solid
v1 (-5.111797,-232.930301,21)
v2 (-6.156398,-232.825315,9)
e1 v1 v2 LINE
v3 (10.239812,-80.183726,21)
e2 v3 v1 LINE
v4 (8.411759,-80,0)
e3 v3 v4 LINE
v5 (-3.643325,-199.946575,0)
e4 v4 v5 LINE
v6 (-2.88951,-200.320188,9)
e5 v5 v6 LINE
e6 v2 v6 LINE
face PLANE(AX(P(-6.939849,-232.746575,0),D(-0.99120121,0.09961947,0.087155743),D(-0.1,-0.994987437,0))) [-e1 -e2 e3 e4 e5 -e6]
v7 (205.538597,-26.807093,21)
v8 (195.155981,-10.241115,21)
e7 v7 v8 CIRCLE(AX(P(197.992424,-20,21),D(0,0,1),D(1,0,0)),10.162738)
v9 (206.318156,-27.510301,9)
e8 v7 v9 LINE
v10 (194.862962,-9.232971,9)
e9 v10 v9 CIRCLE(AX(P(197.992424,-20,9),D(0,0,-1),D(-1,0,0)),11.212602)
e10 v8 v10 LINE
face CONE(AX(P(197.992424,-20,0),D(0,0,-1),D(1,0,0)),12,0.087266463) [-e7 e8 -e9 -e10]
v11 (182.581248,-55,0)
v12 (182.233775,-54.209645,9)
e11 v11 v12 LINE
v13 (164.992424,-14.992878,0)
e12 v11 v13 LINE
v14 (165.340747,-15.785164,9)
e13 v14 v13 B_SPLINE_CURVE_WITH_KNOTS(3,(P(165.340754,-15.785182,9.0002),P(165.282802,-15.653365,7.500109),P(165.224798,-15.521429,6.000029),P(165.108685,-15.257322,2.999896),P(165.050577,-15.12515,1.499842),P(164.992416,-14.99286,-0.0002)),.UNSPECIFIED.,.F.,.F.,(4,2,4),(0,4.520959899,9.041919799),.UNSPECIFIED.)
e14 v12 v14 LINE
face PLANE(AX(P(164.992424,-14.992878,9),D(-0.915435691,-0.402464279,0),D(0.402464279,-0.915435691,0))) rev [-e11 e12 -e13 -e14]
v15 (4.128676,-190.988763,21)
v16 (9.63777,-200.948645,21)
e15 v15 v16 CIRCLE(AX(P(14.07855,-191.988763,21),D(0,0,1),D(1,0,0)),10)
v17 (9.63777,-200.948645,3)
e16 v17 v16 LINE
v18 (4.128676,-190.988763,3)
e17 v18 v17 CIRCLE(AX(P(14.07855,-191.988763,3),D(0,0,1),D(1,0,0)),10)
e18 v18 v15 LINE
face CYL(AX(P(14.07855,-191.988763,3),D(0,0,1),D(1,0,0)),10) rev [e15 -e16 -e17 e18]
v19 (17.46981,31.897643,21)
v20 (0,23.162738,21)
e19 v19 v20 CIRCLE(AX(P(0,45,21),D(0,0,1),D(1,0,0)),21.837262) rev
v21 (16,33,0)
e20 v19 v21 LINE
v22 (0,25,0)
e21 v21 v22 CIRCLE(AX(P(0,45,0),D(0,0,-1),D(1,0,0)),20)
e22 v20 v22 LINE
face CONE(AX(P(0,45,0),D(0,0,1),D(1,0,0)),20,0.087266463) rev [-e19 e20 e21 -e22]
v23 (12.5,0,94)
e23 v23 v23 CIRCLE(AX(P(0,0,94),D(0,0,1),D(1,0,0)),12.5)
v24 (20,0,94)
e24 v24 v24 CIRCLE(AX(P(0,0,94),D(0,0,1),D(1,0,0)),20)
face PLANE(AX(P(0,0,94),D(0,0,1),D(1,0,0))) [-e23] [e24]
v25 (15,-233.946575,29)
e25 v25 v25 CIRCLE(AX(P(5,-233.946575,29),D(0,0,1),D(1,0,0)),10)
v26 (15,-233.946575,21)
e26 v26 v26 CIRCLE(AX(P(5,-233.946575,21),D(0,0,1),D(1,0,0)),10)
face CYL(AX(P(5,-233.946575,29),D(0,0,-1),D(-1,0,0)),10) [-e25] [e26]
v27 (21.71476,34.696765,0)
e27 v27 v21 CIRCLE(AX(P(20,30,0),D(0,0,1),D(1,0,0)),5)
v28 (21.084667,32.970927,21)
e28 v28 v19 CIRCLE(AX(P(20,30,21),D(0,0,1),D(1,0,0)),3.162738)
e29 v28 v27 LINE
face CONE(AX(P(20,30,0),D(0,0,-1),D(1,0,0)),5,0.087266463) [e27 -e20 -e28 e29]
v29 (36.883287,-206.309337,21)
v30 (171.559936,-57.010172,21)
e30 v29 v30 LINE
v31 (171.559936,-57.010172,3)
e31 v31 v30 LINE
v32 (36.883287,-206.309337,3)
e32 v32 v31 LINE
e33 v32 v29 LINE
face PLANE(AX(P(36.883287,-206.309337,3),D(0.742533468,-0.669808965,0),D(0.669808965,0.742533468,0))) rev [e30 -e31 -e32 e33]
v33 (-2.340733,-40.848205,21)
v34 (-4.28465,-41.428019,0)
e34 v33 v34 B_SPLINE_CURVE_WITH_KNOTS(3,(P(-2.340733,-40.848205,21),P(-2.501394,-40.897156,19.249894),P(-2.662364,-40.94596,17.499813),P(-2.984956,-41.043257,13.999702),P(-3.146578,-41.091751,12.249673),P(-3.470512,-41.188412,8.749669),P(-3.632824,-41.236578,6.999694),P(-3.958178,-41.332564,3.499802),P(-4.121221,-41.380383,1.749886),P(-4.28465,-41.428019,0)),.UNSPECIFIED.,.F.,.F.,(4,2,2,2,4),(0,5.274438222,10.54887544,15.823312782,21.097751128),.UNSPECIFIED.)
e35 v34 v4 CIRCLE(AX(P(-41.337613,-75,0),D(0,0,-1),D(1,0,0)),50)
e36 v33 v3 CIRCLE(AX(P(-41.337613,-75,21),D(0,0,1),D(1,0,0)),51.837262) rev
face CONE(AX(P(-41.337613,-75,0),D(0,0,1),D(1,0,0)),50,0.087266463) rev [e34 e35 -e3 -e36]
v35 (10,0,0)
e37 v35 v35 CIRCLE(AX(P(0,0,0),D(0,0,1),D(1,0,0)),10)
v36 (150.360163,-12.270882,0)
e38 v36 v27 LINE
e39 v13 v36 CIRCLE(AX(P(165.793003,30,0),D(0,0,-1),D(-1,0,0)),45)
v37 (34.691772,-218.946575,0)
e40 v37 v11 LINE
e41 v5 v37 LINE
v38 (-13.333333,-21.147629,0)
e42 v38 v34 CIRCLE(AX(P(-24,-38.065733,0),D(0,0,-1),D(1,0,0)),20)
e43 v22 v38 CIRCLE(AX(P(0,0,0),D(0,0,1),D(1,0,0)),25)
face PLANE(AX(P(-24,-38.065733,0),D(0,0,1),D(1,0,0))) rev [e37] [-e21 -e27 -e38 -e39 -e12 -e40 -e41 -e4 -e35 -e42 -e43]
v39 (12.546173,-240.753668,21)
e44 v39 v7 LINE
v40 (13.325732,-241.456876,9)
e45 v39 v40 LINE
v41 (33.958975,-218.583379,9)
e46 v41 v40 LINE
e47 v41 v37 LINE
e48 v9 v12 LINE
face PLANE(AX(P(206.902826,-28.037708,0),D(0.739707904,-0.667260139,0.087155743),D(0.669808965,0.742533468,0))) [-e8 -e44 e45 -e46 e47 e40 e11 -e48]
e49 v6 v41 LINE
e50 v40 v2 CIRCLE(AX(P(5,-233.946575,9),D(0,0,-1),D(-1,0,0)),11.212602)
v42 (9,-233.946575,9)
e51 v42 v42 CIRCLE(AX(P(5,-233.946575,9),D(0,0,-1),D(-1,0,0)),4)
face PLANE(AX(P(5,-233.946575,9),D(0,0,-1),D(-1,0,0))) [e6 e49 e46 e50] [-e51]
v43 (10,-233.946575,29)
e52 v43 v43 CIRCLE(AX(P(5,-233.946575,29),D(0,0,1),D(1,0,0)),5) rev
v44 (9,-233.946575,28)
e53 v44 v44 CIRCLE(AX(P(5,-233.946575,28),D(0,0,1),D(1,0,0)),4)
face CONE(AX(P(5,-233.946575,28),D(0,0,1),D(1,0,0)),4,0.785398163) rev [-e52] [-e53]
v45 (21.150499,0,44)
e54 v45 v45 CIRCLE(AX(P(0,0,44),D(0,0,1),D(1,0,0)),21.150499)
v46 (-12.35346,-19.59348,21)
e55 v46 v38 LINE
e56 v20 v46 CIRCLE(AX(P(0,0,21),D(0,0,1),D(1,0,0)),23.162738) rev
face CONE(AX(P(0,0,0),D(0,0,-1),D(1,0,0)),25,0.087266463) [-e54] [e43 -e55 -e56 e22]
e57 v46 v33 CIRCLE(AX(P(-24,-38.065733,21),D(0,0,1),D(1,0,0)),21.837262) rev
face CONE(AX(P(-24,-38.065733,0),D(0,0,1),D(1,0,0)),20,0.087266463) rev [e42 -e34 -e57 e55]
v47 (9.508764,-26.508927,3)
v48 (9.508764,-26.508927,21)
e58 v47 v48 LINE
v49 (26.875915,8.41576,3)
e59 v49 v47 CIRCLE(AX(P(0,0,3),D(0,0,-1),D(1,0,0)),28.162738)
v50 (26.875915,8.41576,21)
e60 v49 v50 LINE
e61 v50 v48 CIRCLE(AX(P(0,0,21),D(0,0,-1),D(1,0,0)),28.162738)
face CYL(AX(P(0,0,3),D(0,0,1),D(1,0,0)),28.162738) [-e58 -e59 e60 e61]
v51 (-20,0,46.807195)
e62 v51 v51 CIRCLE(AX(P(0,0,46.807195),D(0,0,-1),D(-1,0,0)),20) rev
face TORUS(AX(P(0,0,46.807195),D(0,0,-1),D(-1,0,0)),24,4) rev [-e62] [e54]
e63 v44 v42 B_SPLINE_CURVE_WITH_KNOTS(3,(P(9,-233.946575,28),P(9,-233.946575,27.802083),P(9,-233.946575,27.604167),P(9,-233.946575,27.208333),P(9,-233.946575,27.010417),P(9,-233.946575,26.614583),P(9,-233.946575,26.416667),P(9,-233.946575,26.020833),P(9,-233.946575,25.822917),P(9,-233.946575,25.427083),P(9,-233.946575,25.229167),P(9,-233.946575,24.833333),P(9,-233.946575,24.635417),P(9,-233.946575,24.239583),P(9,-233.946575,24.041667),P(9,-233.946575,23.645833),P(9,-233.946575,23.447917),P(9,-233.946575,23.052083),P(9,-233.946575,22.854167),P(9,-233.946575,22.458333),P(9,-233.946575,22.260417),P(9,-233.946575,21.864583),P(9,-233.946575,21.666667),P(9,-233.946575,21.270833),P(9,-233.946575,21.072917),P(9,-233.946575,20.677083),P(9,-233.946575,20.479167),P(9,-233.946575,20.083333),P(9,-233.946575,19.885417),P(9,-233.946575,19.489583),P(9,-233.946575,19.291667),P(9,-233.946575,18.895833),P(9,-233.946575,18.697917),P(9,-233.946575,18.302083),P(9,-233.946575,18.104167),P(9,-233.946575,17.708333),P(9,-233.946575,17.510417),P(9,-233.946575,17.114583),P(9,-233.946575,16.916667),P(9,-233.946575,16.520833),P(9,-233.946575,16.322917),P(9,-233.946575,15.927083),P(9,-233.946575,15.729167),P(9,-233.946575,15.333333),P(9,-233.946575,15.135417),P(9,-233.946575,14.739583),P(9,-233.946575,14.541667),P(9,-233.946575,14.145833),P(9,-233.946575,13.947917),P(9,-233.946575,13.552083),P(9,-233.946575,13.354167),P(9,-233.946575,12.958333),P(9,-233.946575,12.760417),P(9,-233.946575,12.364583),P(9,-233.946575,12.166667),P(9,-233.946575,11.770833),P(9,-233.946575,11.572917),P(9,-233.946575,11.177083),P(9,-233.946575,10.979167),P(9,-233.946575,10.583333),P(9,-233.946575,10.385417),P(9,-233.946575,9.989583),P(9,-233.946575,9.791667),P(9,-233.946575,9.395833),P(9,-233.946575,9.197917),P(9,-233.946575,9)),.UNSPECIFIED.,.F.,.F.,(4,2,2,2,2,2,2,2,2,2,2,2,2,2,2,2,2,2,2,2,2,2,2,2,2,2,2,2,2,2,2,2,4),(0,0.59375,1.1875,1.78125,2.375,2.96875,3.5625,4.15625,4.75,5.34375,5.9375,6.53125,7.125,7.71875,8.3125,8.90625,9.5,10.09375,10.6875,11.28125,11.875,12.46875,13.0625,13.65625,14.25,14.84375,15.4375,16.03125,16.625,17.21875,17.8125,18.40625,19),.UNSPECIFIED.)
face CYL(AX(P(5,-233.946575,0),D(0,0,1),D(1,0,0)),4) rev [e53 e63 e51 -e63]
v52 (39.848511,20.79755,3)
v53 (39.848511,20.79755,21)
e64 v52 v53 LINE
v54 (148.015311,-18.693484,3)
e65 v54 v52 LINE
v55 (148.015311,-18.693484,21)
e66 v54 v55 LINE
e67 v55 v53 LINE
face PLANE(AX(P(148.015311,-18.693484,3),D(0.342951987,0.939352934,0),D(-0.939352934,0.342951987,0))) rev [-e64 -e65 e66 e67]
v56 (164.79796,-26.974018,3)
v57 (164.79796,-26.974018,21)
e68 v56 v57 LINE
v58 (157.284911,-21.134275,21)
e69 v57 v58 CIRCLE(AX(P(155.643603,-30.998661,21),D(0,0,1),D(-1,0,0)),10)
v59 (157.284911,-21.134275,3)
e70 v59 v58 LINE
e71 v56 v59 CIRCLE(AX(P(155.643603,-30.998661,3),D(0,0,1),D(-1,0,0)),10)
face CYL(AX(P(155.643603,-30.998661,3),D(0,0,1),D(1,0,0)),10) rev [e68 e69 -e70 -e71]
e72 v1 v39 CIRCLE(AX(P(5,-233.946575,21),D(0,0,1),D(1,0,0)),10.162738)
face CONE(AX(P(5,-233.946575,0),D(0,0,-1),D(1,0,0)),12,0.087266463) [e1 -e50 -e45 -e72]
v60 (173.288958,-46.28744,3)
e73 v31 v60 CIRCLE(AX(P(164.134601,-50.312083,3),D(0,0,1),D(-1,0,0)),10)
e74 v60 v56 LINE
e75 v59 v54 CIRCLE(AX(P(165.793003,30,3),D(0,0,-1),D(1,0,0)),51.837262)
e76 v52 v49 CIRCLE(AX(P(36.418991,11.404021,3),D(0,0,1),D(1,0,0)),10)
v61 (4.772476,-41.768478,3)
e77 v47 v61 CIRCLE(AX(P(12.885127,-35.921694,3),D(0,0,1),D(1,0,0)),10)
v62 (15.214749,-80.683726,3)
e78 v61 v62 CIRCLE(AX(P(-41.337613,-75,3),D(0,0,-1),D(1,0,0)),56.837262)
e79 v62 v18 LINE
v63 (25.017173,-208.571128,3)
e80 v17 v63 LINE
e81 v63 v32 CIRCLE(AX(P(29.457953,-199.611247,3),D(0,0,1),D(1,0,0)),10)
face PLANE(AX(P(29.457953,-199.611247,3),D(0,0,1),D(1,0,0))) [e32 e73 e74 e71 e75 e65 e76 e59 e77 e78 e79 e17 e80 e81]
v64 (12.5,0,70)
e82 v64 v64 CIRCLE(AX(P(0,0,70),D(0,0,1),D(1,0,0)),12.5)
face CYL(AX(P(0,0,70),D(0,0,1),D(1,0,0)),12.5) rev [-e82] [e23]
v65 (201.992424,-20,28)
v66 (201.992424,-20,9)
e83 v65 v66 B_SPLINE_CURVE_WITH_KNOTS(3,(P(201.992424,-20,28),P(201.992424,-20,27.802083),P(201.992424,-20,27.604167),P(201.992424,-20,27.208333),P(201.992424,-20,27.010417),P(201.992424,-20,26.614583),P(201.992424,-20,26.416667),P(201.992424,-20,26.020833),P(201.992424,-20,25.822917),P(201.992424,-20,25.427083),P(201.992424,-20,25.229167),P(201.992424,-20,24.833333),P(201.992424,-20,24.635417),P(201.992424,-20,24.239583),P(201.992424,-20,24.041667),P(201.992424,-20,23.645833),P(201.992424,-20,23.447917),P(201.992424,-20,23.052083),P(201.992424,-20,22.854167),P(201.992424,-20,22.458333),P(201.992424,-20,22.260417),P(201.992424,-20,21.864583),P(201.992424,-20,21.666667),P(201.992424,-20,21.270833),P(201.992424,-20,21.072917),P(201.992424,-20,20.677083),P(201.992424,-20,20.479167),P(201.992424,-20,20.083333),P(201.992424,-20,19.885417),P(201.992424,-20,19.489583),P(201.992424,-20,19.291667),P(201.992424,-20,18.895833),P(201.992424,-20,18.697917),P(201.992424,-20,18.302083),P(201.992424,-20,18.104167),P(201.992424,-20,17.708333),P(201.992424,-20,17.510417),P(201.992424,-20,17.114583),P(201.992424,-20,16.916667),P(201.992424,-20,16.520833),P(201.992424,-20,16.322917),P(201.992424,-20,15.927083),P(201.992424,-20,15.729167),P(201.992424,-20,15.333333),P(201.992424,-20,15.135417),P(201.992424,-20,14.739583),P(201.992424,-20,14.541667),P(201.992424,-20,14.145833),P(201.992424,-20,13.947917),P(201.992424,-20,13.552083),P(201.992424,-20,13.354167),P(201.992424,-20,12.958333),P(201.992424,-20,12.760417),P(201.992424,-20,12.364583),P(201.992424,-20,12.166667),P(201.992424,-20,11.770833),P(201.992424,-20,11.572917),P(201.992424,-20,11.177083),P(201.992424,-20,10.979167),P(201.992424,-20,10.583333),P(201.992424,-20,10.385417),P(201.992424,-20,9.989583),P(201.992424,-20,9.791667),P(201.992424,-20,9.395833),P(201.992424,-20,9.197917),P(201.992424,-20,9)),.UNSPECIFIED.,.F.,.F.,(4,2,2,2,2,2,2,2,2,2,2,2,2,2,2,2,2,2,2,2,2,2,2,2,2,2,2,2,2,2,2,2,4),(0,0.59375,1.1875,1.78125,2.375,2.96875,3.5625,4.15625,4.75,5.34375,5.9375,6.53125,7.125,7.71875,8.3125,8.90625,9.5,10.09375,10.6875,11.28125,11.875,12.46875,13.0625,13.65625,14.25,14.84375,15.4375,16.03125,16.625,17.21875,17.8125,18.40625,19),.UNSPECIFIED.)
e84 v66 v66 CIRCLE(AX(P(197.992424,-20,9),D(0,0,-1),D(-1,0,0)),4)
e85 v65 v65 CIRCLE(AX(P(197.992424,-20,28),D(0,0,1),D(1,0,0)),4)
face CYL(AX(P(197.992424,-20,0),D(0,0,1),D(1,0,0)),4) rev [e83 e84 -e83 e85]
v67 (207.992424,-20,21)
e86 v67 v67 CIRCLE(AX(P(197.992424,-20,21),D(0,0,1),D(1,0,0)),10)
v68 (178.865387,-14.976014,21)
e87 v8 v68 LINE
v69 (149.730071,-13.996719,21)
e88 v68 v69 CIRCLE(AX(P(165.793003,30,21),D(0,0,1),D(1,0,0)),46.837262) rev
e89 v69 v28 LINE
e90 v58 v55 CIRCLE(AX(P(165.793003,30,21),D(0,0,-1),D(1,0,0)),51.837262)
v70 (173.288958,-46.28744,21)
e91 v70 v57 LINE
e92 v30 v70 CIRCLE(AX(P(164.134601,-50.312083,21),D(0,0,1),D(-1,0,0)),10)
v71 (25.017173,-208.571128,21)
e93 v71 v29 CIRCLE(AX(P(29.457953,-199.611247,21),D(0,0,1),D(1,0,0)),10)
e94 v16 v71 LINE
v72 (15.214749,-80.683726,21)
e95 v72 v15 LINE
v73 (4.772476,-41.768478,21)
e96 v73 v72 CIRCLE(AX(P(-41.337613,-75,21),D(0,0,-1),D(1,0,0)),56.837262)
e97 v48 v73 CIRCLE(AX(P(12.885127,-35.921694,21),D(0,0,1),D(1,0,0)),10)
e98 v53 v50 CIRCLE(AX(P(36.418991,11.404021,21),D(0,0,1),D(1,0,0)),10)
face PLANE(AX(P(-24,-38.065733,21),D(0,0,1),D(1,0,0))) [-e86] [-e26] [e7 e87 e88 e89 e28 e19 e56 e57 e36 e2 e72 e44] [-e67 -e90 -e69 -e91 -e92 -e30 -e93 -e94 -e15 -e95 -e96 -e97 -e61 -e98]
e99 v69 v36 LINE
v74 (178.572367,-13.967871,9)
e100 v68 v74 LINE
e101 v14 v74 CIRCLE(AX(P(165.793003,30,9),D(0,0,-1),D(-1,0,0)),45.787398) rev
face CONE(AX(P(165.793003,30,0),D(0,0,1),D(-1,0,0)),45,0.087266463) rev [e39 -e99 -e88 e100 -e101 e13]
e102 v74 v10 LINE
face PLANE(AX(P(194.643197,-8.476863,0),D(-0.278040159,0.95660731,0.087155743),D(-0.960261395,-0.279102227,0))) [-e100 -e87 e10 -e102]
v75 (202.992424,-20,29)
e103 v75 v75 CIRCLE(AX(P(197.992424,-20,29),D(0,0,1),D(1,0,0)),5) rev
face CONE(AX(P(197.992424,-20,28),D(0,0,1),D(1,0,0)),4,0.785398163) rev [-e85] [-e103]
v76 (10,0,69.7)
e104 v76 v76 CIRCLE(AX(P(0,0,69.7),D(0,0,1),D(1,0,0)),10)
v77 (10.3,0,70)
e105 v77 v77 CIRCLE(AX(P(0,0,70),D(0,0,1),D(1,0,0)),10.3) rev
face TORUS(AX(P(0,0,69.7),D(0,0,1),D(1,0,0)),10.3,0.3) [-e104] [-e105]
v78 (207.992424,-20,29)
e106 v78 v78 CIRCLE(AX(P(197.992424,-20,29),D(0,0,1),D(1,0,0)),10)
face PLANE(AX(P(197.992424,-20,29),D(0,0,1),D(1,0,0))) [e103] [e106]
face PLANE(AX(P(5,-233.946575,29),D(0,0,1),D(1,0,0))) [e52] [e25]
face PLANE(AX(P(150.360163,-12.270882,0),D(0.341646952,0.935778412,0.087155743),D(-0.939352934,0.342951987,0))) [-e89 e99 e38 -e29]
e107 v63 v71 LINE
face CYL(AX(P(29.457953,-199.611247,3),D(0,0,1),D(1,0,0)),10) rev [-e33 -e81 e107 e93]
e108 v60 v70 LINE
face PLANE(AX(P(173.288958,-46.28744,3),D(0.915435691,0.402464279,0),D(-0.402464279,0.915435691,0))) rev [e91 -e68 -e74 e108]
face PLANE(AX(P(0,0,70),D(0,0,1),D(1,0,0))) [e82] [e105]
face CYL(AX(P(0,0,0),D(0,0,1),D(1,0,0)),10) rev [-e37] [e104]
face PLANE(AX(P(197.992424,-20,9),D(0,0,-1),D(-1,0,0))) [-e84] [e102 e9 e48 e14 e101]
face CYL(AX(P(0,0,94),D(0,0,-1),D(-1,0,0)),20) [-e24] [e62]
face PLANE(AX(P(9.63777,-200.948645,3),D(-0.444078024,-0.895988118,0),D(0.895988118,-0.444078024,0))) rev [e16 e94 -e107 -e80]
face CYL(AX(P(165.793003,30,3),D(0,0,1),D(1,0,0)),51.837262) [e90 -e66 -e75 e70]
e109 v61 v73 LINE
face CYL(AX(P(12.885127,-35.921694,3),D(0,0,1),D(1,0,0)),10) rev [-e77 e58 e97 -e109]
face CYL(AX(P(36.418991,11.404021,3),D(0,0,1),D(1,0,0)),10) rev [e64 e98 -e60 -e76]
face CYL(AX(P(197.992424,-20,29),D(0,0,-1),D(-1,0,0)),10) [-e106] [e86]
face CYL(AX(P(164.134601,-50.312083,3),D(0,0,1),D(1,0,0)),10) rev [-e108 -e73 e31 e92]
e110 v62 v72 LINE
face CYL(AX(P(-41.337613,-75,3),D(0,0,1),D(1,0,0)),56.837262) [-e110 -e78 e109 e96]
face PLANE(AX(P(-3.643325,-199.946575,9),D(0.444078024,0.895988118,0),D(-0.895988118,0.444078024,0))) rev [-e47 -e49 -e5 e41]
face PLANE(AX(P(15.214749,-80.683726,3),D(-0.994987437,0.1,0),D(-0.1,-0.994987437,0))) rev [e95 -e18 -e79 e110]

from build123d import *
from build123d.topology import SkipClean

# Parameters (mm, degrees)
EXTRUDE_741_DEPTH      = 21
EXTRUDE_741_TAPER      = 5
SKETCH_2_R             = 10
EXTRUDE_1024_DEPTH     = 8
CUT_EXTRUDE_1617_DEPTH = 9
SKETCH_4_R             = 23.162738066
EXTRUDE_1852_DEPTH     = 23
EXTRUDE_1852_TAPER     = 5
SKETCH_5_R             = 20
EXTRUDE_1938_DEPTH     = 50
FILLET_1977_R          = 4
SKETCH_6_R             = 12.5
CUT_EXTRUDE_2083_DEPTH = 24
SKETCH_7_R             = 10
CUT_EXTRUDE_2165_DEPTH = 330.802615362
FILLET_2203_R          = 0.3
SKETCH_8_R             = 4
CUT_EXTRUDE_2369_DEPTH = 329.777683375
CHAMFER_2404_SIZE      = 1
CUT_EXTRUDE_3109_DEPTH = 18


with BuildPart() as part:
    # Эскиз1 → Extrude 741 (new body)
    with BuildSketch(Plane.XY):
        with BuildLine():
            ThreePointArc((206.902825712, -28.037707575), (208.16042902, -13.627270923), (194.643197369, -8.47686326))
            Line((194.643197369, -8.47686326), (178.352602864, -13.211762774))
            ThreePointArc((178.352602864, -13.211762774), (164.281318134, -14.974601832), (150.3601632, -12.270882024))
            Line((150.3601632, -12.270882024), (21.714759937, 34.696764669))
            ThreePointArc((21.714759937, 34.696764669), (18.576858011, 34.793189635), (16, 33))
            ThreePointArc((16, 33), (8.94427191, 27.11145618), (0, 25))
            ThreePointArc((0, 25), (-24.017605322, 6.939354046), (-13.333333333, -21.147629234))
            ThreePointArc((-13.333333333, -21.147629234), (-5.735545873, -29.916516988), (-4.284649798, -41.428018512))
            ThreePointArc((-4.284649798, -41.428018512), (6.155658081, -59.36704661), (8.411759167, -80))
            Line((8.411759167, -80), (-6.939849245, -232.746575098))
            ThreePointArc((-6.939849245, -232.746575098), (0.139115456, -244.91798346), (13.910401615, -241.984282673))
            Line((13.910401615, -241.984282673), (206.902825712, -28.037707575))
        make_face()
    extrude(amount=EXTRUDE_741_DEPTH, taper=EXTRUDE_741_TAPER)

    # Эскиз2 → Extrude 1024 (add)
    with BuildSketch(Plane.XY.offset(21)):
        with Locations((5, -233.946575098)):
            Circle(SKETCH_2_R)
        with Locations((197.992424097, -20)):
            Circle(SKETCH_2_R)
    extrude(amount=EXTRUDE_1024_DEPTH)

    # Эскиз3 → Cut-Extrude 1617 (cut)
    with BuildSketch(Plane(origin=(0, 0, 0), x_dir=(-1, 0, 0), z_dir=(0, 0, -1))):
        with BuildLine():
            Line((-164.992424097, -14.992878037), (-182.581248366, -55))
            Line((-182.581248366, -55), (-206.902825712, -28.037707575))
            ThreePointArc((-206.902825712, -28.037707575), (-208.364208989, -13.964597929), (-195.406790483, -8.281873067))
            Line((-195.406790483, -8.281873067), (-164.992424097, -14.992878037))
        make_face()
        with BuildLine():
            Line((3.643325211, -199.946575098), (-34.691772051, -218.946575098))
            Line((-34.691772051, -218.946575098), (-13.910401615, -241.984282673))
            ThreePointArc((-13.910401615, -241.984282673), (-0.139115456, -244.91798346), (6.939849245, -232.746575098))
            Line((6.939849245, -232.746575098), (3.643325211, -199.946575098))
        make_face()
    extrude(amount=-CUT_EXTRUDE_1617_DEPTH, mode=Mode.SUBTRACT)

    # Эскиз4 → Extrude 1852 (add)
    with SkipClean():  # the faces are left unmerged after this step: merging them gives an invalid solid
        with BuildSketch(Plane.XY.offset(21)):
            Circle(SKETCH_4_R)
        extrude(amount=EXTRUDE_1852_DEPTH, taper=EXTRUDE_1852_TAPER)

    # Эскиз5 → Extrude 1938 (add)
    with SkipClean():  # the faces are left unmerged after this step: merging them gives an invalid solid
        with BuildSketch(Plane.XY.offset(44)):
            Circle(SKETCH_5_R)
        extrude(amount=EXTRUDE_1938_DEPTH)

    # Fillet 1977
    # the kernel refuses this fillet: 4 mm, written as the material it adds along each edge
    with BuildSketch(Plane(origin=(0, 0, 44), x_dir=(1, 0, 0), z_dir=(0, -1, 0))) as fillet_1977_piece_1:
        with BuildLine():
            CenterArc((24, 2.807194852), FILLET_1977_R, 180, 44.571493735)
            Line((20, 2.807194852), (19.92, 2.807194852))
            Line((19.92, 2.807194852), (19.92, 0))
            Line((19.92, 0), (20, -0.08))
            ThreePointArc((20, -0.08), (20.575249402, -0.08), (21.093508781, -0.056143897))
            Line((21.093508781, -0.056143897), (21.150498805, 0))
        make_face()
    revolve(axis=Axis((0, 0, 44), (0, 0, 1)))

    # Эскиз6 → Cut-Extrude 2083 (cut)
    with SkipClean():  # the faces are left unmerged after this step: merging them gives an invalid solid
        with BuildSketch(Plane.XY.offset(94)):
            Circle(SKETCH_6_R)
        extrude(amount=-CUT_EXTRUDE_2083_DEPTH, mode=Mode.SUBTRACT)

    # Эскиз7 → Cut-Extrude 2165 (cut, through all)
    with SkipClean():  # the faces are left unmerged after this step: merging them gives an invalid solid
        with BuildSketch(Plane.XY.offset(70)):
            Circle(SKETCH_7_R)
        extrude(amount=-CUT_EXTRUDE_2165_DEPTH, mode=Mode.SUBTRACT)

    # Fillet 2203
    fillet_2203_edges = [part.edges().sort_by_distance(p)[0] for p in [
        (-10, 0, 70),
    ]]
    fillet(fillet_2203_edges, radius=FILLET_2203_R)

    # Эскиз8 → Cut-Extrude 2369 (cut, through all)
    with SkipClean():  # the faces are left unmerged after this step: merging them gives an invalid solid
        with BuildSketch(Plane.XY.offset(29)):
            with Locations((197.992424097, -20)):
                Circle(SKETCH_8_R)
            with Locations((5, -233.946575098)):
                Circle(SKETCH_8_R)
        extrude(amount=-CUT_EXTRUDE_2369_DEPTH, mode=Mode.SUBTRACT)

    # Chamfer 2404
    chamfer_2404_edges = [part.edges().sort_by_distance(p)[0] for p in [
        (193.992424097, -20, 29),
        (1, -233.946575098, 29),
    ]]
    chamfer(chamfer_2404_edges, length=CHAMFER_2404_SIZE)

    # Эскиз11 → Cut-Extrude 3109 (cut)
    with SkipClean():  # the faces are left unmerged after this step: merging them gives an invalid solid
        with BuildSketch(Plane.XY.offset(21)):
            with BuildLine():
                Line((9.637769662, -200.948644603), (25.017172577, -208.571128339))
                ThreePointArc((25.017172577, -208.571128339), (31.330335402, -209.434392448), (36.883287498, -206.3093368))
                Line((36.883287498, -206.3093368), (171.559935828, -57.010172388))
                ThreePointArc((171.559935828, -57.010172388), (174.007077586, -51.904002649), (173.288958057, -46.287439952))
                Line((173.288958057, -46.287439952), (164.797960407, -26.974018349))
                ThreePointArc((164.797960407, -26.974018349), (161.780560792, -23.10323492), (157.284911476, -21.134275293))
                ThreePointArc((157.284911476, -21.134275293), (152.593572172, -20.128602218), (148.015310631, -18.693484081))
                Line((148.015310631, -18.693484081), (39.848510542, 20.797550357))
                ThreePointArc((39.848510542, 20.797550357), (29.514566508, 18.6378946), (26.875914748, 8.415760323))
                ThreePointArc((26.875914748, 8.415760323), (25.216951873, -12.539742964), (9.508763983, -26.50892723))
                ThreePointArc((9.508763983, -26.50892723), (3.334586222, -32.957378734), (4.772476125, -41.76847801))
                ThreePointArc((4.772476125, -41.76847801), (13.557685978, -60.269741059), (15.214748896, -80.683726193))
                Line((15.214748896, -80.683726193), (4.128675533, -190.988763419))
                ThreePointArc((4.128675533, -190.988763419), (5.327976017, -196.828955218), (9.637769662, -200.948644603))
            make_face()
        extrude(amount=-CUT_EXTRUDE_3109_DEPTH, mode=Mode.SUBTRACT)


solid = part.part
